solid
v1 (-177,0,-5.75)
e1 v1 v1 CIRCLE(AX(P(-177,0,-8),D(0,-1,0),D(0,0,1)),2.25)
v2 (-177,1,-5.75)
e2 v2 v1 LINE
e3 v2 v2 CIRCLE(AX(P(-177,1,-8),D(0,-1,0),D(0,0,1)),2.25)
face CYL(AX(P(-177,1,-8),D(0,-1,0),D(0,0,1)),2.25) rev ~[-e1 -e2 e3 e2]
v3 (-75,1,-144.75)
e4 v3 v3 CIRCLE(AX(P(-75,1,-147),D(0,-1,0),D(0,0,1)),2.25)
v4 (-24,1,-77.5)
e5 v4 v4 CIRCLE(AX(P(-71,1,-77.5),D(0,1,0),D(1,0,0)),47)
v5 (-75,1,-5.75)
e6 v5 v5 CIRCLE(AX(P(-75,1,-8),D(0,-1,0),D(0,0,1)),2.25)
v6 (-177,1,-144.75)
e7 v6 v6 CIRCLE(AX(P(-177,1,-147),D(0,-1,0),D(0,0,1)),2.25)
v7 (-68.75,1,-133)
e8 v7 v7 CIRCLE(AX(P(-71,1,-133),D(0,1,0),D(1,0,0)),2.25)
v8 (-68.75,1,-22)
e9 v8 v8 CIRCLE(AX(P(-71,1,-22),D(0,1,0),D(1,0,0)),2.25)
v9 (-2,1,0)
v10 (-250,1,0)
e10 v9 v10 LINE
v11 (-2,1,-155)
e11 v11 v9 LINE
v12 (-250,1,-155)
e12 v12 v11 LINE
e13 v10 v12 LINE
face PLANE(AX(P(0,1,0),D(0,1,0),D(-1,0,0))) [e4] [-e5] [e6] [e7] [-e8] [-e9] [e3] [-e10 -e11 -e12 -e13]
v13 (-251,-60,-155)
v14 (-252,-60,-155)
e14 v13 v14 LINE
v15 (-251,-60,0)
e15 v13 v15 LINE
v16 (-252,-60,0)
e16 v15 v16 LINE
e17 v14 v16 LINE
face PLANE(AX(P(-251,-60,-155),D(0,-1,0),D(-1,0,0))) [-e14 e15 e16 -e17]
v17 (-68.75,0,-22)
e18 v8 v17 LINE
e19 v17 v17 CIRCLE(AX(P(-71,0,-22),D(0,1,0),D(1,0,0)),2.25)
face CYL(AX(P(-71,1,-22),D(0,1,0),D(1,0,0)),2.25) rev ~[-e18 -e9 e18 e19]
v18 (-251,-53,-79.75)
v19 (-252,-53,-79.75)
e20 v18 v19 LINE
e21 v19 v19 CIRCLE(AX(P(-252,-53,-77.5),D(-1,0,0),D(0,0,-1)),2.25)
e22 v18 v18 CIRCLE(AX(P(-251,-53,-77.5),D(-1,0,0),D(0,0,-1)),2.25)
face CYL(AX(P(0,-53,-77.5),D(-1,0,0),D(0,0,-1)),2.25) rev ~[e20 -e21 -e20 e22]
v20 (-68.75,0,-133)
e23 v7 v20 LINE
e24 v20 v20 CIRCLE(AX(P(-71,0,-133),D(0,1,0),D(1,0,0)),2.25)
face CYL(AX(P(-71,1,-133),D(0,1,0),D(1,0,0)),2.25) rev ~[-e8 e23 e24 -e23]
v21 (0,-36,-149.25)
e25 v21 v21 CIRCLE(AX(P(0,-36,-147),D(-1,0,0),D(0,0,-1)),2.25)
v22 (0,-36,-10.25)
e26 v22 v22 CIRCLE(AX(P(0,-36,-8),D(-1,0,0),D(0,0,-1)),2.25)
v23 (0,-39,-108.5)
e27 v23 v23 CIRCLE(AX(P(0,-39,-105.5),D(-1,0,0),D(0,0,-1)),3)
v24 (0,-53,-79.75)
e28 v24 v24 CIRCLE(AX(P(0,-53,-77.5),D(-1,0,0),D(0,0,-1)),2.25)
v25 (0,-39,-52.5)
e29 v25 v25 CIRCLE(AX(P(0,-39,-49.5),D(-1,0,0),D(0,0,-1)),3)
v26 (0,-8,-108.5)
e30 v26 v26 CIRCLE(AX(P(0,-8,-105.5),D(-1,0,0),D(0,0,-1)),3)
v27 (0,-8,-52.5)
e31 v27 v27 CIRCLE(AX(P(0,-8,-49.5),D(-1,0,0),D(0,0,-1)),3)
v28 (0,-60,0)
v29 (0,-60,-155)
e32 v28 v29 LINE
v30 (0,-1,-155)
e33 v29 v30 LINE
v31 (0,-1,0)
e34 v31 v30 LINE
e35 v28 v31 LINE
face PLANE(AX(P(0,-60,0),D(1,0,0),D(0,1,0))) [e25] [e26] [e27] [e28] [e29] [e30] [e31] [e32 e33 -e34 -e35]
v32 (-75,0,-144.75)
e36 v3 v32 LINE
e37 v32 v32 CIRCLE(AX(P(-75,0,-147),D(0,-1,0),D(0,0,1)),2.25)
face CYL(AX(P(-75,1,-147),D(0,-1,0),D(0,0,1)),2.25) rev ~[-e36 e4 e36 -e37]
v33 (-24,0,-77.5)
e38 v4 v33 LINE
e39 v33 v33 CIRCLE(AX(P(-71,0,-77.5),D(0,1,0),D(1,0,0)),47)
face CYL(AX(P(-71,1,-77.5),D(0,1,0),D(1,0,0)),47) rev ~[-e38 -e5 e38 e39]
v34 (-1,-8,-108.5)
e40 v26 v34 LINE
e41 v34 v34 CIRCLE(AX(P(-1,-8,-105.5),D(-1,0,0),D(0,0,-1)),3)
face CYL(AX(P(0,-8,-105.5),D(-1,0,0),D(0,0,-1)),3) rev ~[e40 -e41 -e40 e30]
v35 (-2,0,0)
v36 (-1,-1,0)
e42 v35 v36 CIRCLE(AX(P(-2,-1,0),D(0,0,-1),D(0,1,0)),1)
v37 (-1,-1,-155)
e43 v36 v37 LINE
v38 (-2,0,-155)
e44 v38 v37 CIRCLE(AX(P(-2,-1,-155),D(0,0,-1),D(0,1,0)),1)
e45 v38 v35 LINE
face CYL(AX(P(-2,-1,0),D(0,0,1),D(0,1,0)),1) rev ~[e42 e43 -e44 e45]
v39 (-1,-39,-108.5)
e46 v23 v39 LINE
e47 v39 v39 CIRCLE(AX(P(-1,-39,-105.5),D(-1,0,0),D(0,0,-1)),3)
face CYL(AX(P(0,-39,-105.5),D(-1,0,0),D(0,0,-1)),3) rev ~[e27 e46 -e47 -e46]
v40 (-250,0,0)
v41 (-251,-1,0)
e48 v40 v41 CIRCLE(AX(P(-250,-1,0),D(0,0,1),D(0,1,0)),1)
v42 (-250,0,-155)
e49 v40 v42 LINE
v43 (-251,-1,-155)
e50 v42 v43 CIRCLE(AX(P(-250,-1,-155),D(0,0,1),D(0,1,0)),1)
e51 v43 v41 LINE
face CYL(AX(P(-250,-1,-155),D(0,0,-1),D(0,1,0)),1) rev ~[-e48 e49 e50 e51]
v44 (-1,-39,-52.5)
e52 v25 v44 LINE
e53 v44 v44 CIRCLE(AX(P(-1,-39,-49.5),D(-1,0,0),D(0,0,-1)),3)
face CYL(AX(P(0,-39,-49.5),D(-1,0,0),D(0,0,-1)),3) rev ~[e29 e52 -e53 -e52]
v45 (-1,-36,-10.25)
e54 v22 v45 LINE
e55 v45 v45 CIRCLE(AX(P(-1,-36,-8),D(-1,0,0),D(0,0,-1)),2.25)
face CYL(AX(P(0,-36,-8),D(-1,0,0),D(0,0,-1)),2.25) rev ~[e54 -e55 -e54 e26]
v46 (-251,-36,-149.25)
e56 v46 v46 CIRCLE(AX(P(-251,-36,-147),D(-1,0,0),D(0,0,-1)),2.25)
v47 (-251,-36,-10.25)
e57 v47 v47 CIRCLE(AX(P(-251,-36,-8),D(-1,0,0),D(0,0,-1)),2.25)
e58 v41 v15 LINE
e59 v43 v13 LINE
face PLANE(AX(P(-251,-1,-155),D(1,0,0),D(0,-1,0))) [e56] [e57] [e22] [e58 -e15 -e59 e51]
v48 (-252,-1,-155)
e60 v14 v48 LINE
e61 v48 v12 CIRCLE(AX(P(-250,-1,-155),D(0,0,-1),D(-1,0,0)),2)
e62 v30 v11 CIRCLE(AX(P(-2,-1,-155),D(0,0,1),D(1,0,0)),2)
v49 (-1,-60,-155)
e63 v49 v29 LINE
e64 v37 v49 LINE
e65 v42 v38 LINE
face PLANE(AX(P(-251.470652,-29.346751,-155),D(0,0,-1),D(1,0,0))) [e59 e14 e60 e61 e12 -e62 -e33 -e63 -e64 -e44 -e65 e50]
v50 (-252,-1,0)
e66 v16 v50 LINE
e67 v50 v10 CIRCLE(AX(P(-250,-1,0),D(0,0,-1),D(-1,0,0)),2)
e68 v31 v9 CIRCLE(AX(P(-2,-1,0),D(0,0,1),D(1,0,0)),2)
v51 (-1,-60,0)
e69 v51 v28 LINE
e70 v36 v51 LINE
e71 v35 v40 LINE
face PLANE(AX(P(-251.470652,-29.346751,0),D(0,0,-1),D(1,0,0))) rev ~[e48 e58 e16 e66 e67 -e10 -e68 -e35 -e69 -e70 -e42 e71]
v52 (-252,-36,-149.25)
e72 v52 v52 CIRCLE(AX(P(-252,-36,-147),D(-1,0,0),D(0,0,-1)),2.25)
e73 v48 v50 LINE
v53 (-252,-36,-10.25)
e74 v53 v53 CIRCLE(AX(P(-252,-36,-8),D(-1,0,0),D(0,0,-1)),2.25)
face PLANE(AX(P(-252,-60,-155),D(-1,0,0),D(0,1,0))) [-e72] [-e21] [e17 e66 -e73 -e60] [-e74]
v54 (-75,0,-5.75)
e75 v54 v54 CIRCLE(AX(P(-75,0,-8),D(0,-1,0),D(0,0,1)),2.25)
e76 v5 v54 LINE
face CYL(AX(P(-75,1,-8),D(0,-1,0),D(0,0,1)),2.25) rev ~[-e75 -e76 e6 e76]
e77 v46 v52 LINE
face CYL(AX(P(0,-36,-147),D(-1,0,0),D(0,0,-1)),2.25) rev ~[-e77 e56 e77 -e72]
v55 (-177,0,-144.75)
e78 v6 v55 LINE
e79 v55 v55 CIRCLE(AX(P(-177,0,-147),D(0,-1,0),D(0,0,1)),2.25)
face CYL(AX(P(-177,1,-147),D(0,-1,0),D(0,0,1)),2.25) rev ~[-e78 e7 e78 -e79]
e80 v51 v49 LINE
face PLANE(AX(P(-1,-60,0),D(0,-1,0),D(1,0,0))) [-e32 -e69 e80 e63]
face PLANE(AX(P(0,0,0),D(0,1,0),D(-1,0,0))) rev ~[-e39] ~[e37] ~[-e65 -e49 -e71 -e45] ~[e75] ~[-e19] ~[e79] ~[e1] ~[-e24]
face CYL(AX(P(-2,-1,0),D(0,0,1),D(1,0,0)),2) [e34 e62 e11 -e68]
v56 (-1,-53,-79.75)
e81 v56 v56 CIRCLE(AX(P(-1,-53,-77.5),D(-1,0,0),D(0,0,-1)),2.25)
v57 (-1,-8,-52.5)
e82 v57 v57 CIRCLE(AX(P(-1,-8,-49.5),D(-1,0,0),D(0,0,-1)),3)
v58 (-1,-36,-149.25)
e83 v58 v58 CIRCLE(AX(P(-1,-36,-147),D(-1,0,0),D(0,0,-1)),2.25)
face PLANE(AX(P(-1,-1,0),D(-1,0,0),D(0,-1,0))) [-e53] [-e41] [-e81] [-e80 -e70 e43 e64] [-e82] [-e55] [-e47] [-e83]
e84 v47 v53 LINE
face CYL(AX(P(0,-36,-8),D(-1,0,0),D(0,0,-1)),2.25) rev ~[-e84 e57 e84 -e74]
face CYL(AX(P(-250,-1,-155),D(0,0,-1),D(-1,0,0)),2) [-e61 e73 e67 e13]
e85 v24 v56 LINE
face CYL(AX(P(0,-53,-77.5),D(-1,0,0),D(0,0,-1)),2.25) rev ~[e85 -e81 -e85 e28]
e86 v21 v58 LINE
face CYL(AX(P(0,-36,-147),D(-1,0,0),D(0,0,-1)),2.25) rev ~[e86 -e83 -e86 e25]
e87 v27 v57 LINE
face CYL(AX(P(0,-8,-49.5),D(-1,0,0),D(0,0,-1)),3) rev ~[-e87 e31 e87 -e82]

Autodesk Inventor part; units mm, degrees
ref_plane "YZ Plane" through (0, 0, 0) normal (1, 0, 0) x (0, 1, 0)
ref_plane "XZ Plane" through (0, 0, 0) normal (0, 1, 0) x (-1, 0, 0)
ref_plane "XY Plane" through (0, 0, 0) normal (0, 0, 1) x (1, 0, 0)
sketch "Sketch1" plane through (0, 0, 0) normal (0, 1, 0) x (-1, 0, 0)
  line L0 (0, 0) -> (252, 0)
  line L1 (252, 0) -> (252, -155)
  line L2 (252, -155) -> (0, -155)
  line L3 (0, -155) -> (0, 0)
  dimension "d0" = 252
  dimension "d1" = 155
extrude "Plate1" add sketch "Sketch1" along normal blind 1
sketch "Sketch2" plane through (-1, 1, 0) normal (1, 0, 0) x (0, 1, 0)
  line L0 (0, -155) -> (0, 0)
  line L1 (0, 0) -> (-61, 0)
  line L2 (-61, 0) -> (-61, -155)
  line L3 (-61, -155) -> (0, -155)
edge flange "Flange1" height 61 angle 90 thickness 1 bend radius 1 thickness toward (1, 0, 0) relief tear relief width 1 relief depth 0.5 edges at (0, 0, -77.5) wall of the first edge with corners at (-1, 1, -155) (-1, 1, 0) (-1, -60, 0) (-1, -60, -155)
bend "Bend1"
corner "Corner1"
sketch "Sketch3" plane through (-251, 1, -155) normal (-1, 0, 0) x (0, -1, 0)
  line L0 (0, 155) -> (0, 0)
  line L1 (0, 0) -> (61, 0)
  line L2 (61, 0) -> (61, 155)
  line L3 (61, 155) -> (0, 155)
edge flange "Flange2" height 61 angle 90 thickness 1 bend radius 1 thickness toward (-1, 0, 0) relief tear relief width 1 relief depth 0.5 edges at (-252, 0, -77.5) wall of the first edge with corners at (-251, 1, 0) (-251, 1, -155) (-251, -60, -155) (-251, -60, 0)
bend "Bend2"
corner "Corner2"
sketch "Sketch4" plane through (0, 1, 0) normal (0, 1, 0) x (1, 0, 0)
  line L0 (0, 155) -> (0, 0) projected
  line L1 (0, 0) -> (0, 77.5)
  line L2 (0, 77.5) -> (-71, 77.5)
  circle A0 centre (-71, 77.5) radius 47
  line L3 (-71, 77.5) -> (-71, 133) construction
  line L4 (-71, 77.5) -> (-71, 22) construction
  circle A1 centre (-71, 133) radius 2.25
  circle A2 centre (-71, 22) radius 2.25
  dimension "d23" = 77.5
  dimension "d24" = 71
  dimension "d25" = 94
  dimension "d26" = 55.5
  dimension "d27" = 55.5
  dimension "d28" = 4.5
  dimension "d29" = 4.5
extrude "Extrusion1" cut sketch "Sketch4" against normal through all
sketch "Sketch5" plane through (0, 1, 0) normal (0, 1, 0) x (1, 0, 0)
  line L0 (-252, 0) -> (-252, 155) projected
  line L1 (0, 155) -> (0, 0) projected
  line L2 (-250, 155) -> (-2, 155) projected
  line L3 (-2, 0) -> (-250, 0) projected
  point P0 (-177, 147)
  point P1 (-75, 147)
  point P2 (-177, 8)
  point P3 (-75, 8)
  dimension "d32" = 75
  dimension "d33" = 75
  dimension "d34" = 8
  dimension "d35" = 8
hole "Hole1" at (-177, 1, -147) at (-75, 1, -147) at (-177, 1, -8) at (-75, 1, -8) direction (0, -1, 0) diameter 4.5 end through all
sketch "Sketch6" plane through (0, -60, 0) normal (1, 0, 0) x (0, 0, -1)
  line L0 (0, 0) -> (0, 59) projected
  line L1 (155, 0) -> (0, 0) projected
  line L2 (155, 59) -> (155, 0) projected
  point P0 (0, 60)
  point P1 (8, 24)
  point P2 (77.5, 7)
  point P3 (147, 24)
  dimension "d43" = 77.5
  dimension "d44" = 7
  dimension "d45" = 8
  dimension "d46" = 8
  dimension "d47" = 24
  dimension "d48" = 24
hole "Hole2" at (0, -36, -8) at (0, -53, -77.5) at (0, -36, -147) direction (-1, 0, 0) diameter 4.5 end through all
sketch "Sketch7" plane through (0, -60, 0) normal (1, 0, 0) x (0, 0, -1)
  line L0 (155, 60) -> (0, 60) projected
  line L1 (0, 59) -> (155, 59) projected
  line L2 (77.5, 59) -> (42.5, 59)
  line L3 (42.5, 59) -> (42.5, 14)
  line L4 (42.5, 14) -> (112.5, 14)
  line L5 (112.5, 14) -> (112.5, 59)
  point P0 (49.5, 52)
  point P1 (49.5, 21)
  point P2 (105.5, 21)
  point P3 (105.5, 52)
  dimension "d57" = 35
  dimension "d58" = 45
  dimension "d59" = 70
  dimension "d60" = 7
  dimension "d61" = 7
  dimension "d62" = 7
  dimension "d63" = 7
hole "Hole3" at (0, -8, -49.5) at (0, -39, -49.5) at (0, -39, -105.5) at (0, -8, -105.5) direction (-1, 0, 0) diameter 6 depth 1
equation "\"d33\" = d32"
equation "\"d34\" = d35"
equation "\"d41\" = Thickness"
equation "\"d46\" = d45"
equation "\"d48\" = d47"
equation "\"d54\" = Thickness"
equation "\"d61\" = d60"
equation "\"d63\" = d62"
equation "\"d69\" = Thickness"
equation "\"d2\" = Thickness"
equation "\"d3\" = BendReliefWidth"
equation "\"d4\" = BendReliefDepth"
equation "\"d5\" = MinimumRemnant"
equation "\"d6\" = TransitionRadius"
equation "\"d9\" = BendRadius"
equation "\"d10\" = CornerReliefSize"
equation "\"d11\" = GapSize"
equation "\"d12\" = JacobiRadiusSize"
equation "\"d13\" = BendReliefWidth"
equation "\"d14\" = BendReliefDepth"
equation "\"d15\" = MinimumRemnant"
equation "\"d16\" = TransitionRadius"
equation "\"d19\" = BendRadius"
equation "\"d20\" = CornerReliefSize"
equation "\"d21\" = GapSize"
equation "\"d22\" = JacobiRadiusSize"
equation "\"BendRadius\" = Thickness"
equation "\"BendReliefWidth\" = Thickness"
equation "\"BendReliefDepth\" = 0.5 * Thickness"
equation "\"CornerReliefSize\" = 4 * Thickness"
equation "\"MinimumRemnant\" = 2 * Thickness"
equation "\"TransitionRadius\" = BendRadius"
equation "\"JacobiRadiusSize\" = BendRadius"
equation "\"GapSize\" = Thickness"
equation "\"Thickness\" = 1"
properties part number "tapa_v7" material "Steel, Carbon"
